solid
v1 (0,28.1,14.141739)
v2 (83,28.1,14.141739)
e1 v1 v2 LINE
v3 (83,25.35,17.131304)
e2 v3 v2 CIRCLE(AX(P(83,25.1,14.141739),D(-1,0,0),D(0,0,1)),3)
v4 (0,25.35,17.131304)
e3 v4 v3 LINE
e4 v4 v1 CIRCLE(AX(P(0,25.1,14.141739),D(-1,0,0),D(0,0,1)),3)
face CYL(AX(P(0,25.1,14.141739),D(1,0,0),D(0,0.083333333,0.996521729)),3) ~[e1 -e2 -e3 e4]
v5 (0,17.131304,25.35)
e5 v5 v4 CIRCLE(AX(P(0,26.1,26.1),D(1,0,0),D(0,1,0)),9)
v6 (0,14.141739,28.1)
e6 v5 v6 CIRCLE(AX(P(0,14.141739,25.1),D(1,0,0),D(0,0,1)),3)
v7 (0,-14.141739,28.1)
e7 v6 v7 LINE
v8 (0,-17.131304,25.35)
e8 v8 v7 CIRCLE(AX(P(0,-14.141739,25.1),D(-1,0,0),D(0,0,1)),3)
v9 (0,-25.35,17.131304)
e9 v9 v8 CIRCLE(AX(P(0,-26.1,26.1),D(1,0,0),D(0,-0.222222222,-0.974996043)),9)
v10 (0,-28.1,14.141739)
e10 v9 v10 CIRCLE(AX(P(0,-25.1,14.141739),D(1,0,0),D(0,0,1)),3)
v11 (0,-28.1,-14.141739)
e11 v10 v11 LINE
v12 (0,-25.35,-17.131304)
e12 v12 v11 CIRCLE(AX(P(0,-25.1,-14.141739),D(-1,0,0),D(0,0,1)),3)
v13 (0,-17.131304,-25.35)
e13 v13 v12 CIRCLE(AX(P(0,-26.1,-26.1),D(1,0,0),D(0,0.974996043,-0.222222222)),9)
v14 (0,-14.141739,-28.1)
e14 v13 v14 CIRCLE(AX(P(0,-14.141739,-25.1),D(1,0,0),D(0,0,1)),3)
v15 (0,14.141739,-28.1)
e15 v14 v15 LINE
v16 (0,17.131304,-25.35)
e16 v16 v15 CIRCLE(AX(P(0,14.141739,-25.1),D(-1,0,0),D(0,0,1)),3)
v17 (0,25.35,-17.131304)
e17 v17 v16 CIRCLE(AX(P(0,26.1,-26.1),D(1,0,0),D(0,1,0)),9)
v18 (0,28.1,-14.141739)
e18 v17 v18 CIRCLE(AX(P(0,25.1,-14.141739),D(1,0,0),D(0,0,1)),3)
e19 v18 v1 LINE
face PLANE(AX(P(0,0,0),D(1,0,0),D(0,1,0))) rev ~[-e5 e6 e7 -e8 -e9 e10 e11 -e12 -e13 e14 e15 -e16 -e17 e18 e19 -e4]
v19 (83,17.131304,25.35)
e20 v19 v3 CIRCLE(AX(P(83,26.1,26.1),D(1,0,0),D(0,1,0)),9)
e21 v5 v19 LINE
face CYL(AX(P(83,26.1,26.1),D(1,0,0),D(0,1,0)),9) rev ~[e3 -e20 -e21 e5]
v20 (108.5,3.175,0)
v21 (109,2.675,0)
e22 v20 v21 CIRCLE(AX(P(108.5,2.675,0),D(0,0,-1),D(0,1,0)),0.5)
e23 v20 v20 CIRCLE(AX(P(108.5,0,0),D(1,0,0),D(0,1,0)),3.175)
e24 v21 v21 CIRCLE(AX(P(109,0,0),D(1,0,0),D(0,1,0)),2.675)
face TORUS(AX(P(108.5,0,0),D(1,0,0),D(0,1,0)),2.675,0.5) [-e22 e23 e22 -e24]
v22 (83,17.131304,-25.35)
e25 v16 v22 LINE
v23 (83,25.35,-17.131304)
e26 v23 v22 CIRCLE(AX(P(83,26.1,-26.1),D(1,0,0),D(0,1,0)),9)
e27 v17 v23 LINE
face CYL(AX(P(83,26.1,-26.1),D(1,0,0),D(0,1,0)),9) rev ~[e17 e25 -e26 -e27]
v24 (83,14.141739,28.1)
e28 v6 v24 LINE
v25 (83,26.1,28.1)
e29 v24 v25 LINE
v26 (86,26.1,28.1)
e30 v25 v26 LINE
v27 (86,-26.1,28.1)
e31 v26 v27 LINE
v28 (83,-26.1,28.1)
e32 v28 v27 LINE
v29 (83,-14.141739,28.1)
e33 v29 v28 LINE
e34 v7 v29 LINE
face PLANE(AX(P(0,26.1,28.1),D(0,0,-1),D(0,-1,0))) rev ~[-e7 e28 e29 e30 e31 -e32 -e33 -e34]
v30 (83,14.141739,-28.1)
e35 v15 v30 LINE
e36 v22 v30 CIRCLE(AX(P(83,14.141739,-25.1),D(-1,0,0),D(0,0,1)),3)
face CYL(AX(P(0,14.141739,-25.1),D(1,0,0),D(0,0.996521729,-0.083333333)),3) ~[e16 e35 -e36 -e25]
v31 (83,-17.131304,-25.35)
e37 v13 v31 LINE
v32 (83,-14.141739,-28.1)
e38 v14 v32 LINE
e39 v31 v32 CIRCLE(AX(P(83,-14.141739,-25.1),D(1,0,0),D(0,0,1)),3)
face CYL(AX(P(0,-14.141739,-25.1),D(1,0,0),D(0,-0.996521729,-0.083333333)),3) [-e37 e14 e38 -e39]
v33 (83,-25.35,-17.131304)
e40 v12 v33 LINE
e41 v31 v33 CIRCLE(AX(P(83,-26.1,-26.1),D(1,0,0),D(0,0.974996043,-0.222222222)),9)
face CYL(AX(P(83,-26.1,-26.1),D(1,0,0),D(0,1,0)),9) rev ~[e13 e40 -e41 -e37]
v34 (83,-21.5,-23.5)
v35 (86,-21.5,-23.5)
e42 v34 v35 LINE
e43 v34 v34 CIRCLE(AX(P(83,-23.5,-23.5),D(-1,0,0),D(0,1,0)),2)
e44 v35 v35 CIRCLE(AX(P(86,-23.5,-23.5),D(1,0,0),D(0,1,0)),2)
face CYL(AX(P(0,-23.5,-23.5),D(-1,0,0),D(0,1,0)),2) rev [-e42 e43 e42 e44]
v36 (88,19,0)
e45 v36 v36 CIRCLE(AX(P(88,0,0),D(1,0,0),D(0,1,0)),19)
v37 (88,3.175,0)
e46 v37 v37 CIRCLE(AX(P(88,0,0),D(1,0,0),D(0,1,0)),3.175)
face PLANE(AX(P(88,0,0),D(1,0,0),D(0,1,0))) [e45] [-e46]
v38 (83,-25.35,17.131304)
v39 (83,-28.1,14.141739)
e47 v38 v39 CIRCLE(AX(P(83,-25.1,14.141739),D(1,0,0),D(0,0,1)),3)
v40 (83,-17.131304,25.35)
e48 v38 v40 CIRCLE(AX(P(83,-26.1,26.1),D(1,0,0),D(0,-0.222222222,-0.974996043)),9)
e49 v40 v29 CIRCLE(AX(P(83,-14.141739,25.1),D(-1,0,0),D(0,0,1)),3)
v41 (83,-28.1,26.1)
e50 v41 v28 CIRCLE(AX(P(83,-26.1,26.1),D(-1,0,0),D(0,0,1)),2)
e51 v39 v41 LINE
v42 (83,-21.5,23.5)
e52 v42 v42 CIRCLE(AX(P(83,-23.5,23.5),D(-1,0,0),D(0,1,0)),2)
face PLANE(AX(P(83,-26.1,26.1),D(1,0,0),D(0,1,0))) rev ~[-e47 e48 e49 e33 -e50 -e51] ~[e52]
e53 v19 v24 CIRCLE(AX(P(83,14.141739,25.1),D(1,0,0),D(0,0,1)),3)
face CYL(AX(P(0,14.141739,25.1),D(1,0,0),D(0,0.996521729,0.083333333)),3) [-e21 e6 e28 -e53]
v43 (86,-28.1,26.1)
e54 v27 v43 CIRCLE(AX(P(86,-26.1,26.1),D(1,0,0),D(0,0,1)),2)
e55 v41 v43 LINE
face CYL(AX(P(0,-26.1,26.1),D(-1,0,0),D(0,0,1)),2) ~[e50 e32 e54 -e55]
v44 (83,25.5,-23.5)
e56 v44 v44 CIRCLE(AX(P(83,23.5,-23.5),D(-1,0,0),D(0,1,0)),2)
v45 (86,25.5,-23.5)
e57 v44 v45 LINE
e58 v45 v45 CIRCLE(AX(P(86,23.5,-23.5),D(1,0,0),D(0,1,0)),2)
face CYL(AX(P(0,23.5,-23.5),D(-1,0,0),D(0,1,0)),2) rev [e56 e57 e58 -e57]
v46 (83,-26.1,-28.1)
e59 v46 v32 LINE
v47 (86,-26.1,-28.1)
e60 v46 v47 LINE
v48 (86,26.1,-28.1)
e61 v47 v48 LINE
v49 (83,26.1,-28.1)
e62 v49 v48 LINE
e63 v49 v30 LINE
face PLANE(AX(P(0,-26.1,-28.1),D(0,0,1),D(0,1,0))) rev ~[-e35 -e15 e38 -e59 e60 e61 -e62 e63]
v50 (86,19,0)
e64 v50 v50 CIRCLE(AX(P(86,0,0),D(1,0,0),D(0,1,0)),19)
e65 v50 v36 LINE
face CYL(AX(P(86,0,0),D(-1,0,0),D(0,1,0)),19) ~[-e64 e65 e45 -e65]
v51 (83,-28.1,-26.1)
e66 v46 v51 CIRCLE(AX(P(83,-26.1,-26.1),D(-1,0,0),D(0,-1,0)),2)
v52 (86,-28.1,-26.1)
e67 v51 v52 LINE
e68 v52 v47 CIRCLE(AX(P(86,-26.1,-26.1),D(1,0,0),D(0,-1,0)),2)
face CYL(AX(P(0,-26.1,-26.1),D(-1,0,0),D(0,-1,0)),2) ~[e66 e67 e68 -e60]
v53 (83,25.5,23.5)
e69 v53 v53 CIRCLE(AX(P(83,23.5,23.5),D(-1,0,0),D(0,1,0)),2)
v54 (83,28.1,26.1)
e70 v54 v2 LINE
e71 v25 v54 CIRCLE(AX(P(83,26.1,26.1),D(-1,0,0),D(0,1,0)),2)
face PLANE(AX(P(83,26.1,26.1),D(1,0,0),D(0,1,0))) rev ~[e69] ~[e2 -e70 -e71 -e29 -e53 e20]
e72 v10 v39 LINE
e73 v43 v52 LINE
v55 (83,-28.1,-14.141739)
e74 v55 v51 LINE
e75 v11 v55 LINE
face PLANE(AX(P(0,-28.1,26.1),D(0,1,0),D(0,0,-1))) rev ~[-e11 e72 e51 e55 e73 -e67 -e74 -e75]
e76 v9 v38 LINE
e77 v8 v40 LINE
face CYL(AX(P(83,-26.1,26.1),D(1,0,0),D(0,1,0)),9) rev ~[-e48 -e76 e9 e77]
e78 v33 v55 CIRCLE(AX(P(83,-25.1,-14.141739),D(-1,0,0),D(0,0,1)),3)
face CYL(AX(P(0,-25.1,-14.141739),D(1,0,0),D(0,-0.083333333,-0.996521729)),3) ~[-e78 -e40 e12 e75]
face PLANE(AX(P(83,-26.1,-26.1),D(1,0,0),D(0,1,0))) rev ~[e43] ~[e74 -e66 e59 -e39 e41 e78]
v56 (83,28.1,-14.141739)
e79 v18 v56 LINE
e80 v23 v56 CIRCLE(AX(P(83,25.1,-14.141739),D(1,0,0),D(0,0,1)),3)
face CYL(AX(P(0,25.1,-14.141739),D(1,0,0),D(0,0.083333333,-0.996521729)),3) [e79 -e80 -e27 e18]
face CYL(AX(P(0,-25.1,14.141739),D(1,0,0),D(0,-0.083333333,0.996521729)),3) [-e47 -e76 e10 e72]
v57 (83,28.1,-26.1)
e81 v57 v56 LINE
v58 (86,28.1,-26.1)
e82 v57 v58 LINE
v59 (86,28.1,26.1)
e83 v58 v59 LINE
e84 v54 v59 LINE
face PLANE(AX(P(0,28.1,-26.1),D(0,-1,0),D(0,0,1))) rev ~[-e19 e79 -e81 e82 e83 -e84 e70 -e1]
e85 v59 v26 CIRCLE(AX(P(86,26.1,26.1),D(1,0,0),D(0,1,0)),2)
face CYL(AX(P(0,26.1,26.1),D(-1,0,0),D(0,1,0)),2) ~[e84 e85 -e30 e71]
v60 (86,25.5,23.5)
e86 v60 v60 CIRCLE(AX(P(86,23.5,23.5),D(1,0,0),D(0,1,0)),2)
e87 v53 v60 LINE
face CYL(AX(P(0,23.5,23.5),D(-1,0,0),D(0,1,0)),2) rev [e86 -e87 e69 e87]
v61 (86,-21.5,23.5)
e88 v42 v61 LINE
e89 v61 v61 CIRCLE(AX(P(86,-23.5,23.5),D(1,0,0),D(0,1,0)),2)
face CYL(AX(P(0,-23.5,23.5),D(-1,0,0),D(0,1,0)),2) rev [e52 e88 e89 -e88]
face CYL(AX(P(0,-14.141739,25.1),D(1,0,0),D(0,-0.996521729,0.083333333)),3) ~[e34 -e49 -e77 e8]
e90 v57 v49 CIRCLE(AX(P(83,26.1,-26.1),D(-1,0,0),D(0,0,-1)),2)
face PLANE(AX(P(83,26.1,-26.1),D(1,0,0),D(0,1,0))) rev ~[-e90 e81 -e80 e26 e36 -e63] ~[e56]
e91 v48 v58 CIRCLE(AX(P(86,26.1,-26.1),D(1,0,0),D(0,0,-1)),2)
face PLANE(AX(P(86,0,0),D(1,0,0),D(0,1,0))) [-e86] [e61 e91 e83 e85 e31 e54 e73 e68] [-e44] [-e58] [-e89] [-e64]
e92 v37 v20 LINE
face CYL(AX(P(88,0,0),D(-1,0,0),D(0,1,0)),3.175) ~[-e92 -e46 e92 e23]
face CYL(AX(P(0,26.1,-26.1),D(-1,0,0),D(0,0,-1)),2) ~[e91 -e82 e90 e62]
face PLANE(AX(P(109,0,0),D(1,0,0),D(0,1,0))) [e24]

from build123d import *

# Parameters (mm, degrees)
F0_R     = 2
F1_DEPTH = 86
F2_R     = 19
F3_DEPTH = 2
F4_R     = 3.175
F5_DEPTH = 21
F6_R     = 0.5
F8_R     = 9
F9_DEPTH = 83
F10_R    = 3


# Not quite as in the source:
# - a feature names something its author has since deleted; it is built from what else it names


with BuildPart() as f1:
    # F0 (on Right) → F1 (new body)
    with BuildSketch(Plane.YZ):
        with BuildLine():
            Line((26.1, 28.1), (-26.1, 28.1))
            ThreePointArc((-26.1, 28.1), (-27.5142135624, 27.5142135624), (-28.1, 26.1))
            Line((-28.1, 26.1), (-28.1, -26.1))
            ThreePointArc((-28.1, -26.1), (-27.5142135624, -27.5142135624), (-26.1, -28.1))
            Line((-26.1, -28.1), (26.1, -28.1))
            ThreePointArc((26.1, -28.1), (27.5142135624, -27.5142135624), (28.1, -26.1))
            Line((28.1, -26.1), (28.1, 26.1))
            ThreePointArc((28.1, 26.1), (27.5142135624, 27.5142135624), (26.1, 28.1))
        make_face()
        with Locations((-23.5, -23.5)):
            Circle(F0_R, mode=Mode.SUBTRACT)
        with Locations((23.5, -23.5)):
            Circle(F0_R, mode=Mode.SUBTRACT)
        with Locations((-23.5, 23.5)):
            Circle(F0_R, mode=Mode.SUBTRACT)
        with Locations((23.5, 23.5)):
            Circle(F0_R, mode=Mode.SUBTRACT)
    extrude(amount=F1_DEPTH)

    # F2 (on face) → F3 (join)
    with BuildSketch(Plane.YZ.offset(86)):
        Circle(F2_R)
    extrude(amount=F3_DEPTH)

    # F4 (on face) → F5 (join)
    with BuildSketch(Plane.YZ.offset(88)):
        Circle(F4_R)
    extrude(amount=F5_DEPTH)

    # F6
    f6_edges = [f1.edges().sort_by_distance(p)[0] for p in [
        (109, -3.175, 0),
    ]]
    fillet(f6_edges, radius=F6_R)

    # F8 (on offset) → F9 (cut, through all)
    with BuildSketch(Plane.YZ.offset(83)):
        with Locations((-26.1, 26.1)):
            Circle(F8_R)
        with Locations((26.1, 26.1)):
            Circle(F8_R)
        with Locations((-26.1, -26.1)):
            Circle(F8_R)
        with Locations((26.1, -26.1)):
            Circle(F8_R)
    extrude(amount=-F9_DEPTH, mode=Mode.SUBTRACT)

    # F10
    f10_edges = [f1.edges().sort_by_distance(p)[0] for p in [
        (41.5, 17.325036, 28.1),
        (41.5, 28.1, 17.325036),
        (41.5, -17.325036, 28.1),
        (41.5, -28.1, 17.325036),
        (41.5, -28.1, -17.325036),
        (41.5, -17.325036, -28.1),
        (41.5, 17.325036, -28.1),
        (41.5, 28.1, -17.325036),
    ]]
    fillet(f10_edges, radius=F10_R)


solid = f1.part
